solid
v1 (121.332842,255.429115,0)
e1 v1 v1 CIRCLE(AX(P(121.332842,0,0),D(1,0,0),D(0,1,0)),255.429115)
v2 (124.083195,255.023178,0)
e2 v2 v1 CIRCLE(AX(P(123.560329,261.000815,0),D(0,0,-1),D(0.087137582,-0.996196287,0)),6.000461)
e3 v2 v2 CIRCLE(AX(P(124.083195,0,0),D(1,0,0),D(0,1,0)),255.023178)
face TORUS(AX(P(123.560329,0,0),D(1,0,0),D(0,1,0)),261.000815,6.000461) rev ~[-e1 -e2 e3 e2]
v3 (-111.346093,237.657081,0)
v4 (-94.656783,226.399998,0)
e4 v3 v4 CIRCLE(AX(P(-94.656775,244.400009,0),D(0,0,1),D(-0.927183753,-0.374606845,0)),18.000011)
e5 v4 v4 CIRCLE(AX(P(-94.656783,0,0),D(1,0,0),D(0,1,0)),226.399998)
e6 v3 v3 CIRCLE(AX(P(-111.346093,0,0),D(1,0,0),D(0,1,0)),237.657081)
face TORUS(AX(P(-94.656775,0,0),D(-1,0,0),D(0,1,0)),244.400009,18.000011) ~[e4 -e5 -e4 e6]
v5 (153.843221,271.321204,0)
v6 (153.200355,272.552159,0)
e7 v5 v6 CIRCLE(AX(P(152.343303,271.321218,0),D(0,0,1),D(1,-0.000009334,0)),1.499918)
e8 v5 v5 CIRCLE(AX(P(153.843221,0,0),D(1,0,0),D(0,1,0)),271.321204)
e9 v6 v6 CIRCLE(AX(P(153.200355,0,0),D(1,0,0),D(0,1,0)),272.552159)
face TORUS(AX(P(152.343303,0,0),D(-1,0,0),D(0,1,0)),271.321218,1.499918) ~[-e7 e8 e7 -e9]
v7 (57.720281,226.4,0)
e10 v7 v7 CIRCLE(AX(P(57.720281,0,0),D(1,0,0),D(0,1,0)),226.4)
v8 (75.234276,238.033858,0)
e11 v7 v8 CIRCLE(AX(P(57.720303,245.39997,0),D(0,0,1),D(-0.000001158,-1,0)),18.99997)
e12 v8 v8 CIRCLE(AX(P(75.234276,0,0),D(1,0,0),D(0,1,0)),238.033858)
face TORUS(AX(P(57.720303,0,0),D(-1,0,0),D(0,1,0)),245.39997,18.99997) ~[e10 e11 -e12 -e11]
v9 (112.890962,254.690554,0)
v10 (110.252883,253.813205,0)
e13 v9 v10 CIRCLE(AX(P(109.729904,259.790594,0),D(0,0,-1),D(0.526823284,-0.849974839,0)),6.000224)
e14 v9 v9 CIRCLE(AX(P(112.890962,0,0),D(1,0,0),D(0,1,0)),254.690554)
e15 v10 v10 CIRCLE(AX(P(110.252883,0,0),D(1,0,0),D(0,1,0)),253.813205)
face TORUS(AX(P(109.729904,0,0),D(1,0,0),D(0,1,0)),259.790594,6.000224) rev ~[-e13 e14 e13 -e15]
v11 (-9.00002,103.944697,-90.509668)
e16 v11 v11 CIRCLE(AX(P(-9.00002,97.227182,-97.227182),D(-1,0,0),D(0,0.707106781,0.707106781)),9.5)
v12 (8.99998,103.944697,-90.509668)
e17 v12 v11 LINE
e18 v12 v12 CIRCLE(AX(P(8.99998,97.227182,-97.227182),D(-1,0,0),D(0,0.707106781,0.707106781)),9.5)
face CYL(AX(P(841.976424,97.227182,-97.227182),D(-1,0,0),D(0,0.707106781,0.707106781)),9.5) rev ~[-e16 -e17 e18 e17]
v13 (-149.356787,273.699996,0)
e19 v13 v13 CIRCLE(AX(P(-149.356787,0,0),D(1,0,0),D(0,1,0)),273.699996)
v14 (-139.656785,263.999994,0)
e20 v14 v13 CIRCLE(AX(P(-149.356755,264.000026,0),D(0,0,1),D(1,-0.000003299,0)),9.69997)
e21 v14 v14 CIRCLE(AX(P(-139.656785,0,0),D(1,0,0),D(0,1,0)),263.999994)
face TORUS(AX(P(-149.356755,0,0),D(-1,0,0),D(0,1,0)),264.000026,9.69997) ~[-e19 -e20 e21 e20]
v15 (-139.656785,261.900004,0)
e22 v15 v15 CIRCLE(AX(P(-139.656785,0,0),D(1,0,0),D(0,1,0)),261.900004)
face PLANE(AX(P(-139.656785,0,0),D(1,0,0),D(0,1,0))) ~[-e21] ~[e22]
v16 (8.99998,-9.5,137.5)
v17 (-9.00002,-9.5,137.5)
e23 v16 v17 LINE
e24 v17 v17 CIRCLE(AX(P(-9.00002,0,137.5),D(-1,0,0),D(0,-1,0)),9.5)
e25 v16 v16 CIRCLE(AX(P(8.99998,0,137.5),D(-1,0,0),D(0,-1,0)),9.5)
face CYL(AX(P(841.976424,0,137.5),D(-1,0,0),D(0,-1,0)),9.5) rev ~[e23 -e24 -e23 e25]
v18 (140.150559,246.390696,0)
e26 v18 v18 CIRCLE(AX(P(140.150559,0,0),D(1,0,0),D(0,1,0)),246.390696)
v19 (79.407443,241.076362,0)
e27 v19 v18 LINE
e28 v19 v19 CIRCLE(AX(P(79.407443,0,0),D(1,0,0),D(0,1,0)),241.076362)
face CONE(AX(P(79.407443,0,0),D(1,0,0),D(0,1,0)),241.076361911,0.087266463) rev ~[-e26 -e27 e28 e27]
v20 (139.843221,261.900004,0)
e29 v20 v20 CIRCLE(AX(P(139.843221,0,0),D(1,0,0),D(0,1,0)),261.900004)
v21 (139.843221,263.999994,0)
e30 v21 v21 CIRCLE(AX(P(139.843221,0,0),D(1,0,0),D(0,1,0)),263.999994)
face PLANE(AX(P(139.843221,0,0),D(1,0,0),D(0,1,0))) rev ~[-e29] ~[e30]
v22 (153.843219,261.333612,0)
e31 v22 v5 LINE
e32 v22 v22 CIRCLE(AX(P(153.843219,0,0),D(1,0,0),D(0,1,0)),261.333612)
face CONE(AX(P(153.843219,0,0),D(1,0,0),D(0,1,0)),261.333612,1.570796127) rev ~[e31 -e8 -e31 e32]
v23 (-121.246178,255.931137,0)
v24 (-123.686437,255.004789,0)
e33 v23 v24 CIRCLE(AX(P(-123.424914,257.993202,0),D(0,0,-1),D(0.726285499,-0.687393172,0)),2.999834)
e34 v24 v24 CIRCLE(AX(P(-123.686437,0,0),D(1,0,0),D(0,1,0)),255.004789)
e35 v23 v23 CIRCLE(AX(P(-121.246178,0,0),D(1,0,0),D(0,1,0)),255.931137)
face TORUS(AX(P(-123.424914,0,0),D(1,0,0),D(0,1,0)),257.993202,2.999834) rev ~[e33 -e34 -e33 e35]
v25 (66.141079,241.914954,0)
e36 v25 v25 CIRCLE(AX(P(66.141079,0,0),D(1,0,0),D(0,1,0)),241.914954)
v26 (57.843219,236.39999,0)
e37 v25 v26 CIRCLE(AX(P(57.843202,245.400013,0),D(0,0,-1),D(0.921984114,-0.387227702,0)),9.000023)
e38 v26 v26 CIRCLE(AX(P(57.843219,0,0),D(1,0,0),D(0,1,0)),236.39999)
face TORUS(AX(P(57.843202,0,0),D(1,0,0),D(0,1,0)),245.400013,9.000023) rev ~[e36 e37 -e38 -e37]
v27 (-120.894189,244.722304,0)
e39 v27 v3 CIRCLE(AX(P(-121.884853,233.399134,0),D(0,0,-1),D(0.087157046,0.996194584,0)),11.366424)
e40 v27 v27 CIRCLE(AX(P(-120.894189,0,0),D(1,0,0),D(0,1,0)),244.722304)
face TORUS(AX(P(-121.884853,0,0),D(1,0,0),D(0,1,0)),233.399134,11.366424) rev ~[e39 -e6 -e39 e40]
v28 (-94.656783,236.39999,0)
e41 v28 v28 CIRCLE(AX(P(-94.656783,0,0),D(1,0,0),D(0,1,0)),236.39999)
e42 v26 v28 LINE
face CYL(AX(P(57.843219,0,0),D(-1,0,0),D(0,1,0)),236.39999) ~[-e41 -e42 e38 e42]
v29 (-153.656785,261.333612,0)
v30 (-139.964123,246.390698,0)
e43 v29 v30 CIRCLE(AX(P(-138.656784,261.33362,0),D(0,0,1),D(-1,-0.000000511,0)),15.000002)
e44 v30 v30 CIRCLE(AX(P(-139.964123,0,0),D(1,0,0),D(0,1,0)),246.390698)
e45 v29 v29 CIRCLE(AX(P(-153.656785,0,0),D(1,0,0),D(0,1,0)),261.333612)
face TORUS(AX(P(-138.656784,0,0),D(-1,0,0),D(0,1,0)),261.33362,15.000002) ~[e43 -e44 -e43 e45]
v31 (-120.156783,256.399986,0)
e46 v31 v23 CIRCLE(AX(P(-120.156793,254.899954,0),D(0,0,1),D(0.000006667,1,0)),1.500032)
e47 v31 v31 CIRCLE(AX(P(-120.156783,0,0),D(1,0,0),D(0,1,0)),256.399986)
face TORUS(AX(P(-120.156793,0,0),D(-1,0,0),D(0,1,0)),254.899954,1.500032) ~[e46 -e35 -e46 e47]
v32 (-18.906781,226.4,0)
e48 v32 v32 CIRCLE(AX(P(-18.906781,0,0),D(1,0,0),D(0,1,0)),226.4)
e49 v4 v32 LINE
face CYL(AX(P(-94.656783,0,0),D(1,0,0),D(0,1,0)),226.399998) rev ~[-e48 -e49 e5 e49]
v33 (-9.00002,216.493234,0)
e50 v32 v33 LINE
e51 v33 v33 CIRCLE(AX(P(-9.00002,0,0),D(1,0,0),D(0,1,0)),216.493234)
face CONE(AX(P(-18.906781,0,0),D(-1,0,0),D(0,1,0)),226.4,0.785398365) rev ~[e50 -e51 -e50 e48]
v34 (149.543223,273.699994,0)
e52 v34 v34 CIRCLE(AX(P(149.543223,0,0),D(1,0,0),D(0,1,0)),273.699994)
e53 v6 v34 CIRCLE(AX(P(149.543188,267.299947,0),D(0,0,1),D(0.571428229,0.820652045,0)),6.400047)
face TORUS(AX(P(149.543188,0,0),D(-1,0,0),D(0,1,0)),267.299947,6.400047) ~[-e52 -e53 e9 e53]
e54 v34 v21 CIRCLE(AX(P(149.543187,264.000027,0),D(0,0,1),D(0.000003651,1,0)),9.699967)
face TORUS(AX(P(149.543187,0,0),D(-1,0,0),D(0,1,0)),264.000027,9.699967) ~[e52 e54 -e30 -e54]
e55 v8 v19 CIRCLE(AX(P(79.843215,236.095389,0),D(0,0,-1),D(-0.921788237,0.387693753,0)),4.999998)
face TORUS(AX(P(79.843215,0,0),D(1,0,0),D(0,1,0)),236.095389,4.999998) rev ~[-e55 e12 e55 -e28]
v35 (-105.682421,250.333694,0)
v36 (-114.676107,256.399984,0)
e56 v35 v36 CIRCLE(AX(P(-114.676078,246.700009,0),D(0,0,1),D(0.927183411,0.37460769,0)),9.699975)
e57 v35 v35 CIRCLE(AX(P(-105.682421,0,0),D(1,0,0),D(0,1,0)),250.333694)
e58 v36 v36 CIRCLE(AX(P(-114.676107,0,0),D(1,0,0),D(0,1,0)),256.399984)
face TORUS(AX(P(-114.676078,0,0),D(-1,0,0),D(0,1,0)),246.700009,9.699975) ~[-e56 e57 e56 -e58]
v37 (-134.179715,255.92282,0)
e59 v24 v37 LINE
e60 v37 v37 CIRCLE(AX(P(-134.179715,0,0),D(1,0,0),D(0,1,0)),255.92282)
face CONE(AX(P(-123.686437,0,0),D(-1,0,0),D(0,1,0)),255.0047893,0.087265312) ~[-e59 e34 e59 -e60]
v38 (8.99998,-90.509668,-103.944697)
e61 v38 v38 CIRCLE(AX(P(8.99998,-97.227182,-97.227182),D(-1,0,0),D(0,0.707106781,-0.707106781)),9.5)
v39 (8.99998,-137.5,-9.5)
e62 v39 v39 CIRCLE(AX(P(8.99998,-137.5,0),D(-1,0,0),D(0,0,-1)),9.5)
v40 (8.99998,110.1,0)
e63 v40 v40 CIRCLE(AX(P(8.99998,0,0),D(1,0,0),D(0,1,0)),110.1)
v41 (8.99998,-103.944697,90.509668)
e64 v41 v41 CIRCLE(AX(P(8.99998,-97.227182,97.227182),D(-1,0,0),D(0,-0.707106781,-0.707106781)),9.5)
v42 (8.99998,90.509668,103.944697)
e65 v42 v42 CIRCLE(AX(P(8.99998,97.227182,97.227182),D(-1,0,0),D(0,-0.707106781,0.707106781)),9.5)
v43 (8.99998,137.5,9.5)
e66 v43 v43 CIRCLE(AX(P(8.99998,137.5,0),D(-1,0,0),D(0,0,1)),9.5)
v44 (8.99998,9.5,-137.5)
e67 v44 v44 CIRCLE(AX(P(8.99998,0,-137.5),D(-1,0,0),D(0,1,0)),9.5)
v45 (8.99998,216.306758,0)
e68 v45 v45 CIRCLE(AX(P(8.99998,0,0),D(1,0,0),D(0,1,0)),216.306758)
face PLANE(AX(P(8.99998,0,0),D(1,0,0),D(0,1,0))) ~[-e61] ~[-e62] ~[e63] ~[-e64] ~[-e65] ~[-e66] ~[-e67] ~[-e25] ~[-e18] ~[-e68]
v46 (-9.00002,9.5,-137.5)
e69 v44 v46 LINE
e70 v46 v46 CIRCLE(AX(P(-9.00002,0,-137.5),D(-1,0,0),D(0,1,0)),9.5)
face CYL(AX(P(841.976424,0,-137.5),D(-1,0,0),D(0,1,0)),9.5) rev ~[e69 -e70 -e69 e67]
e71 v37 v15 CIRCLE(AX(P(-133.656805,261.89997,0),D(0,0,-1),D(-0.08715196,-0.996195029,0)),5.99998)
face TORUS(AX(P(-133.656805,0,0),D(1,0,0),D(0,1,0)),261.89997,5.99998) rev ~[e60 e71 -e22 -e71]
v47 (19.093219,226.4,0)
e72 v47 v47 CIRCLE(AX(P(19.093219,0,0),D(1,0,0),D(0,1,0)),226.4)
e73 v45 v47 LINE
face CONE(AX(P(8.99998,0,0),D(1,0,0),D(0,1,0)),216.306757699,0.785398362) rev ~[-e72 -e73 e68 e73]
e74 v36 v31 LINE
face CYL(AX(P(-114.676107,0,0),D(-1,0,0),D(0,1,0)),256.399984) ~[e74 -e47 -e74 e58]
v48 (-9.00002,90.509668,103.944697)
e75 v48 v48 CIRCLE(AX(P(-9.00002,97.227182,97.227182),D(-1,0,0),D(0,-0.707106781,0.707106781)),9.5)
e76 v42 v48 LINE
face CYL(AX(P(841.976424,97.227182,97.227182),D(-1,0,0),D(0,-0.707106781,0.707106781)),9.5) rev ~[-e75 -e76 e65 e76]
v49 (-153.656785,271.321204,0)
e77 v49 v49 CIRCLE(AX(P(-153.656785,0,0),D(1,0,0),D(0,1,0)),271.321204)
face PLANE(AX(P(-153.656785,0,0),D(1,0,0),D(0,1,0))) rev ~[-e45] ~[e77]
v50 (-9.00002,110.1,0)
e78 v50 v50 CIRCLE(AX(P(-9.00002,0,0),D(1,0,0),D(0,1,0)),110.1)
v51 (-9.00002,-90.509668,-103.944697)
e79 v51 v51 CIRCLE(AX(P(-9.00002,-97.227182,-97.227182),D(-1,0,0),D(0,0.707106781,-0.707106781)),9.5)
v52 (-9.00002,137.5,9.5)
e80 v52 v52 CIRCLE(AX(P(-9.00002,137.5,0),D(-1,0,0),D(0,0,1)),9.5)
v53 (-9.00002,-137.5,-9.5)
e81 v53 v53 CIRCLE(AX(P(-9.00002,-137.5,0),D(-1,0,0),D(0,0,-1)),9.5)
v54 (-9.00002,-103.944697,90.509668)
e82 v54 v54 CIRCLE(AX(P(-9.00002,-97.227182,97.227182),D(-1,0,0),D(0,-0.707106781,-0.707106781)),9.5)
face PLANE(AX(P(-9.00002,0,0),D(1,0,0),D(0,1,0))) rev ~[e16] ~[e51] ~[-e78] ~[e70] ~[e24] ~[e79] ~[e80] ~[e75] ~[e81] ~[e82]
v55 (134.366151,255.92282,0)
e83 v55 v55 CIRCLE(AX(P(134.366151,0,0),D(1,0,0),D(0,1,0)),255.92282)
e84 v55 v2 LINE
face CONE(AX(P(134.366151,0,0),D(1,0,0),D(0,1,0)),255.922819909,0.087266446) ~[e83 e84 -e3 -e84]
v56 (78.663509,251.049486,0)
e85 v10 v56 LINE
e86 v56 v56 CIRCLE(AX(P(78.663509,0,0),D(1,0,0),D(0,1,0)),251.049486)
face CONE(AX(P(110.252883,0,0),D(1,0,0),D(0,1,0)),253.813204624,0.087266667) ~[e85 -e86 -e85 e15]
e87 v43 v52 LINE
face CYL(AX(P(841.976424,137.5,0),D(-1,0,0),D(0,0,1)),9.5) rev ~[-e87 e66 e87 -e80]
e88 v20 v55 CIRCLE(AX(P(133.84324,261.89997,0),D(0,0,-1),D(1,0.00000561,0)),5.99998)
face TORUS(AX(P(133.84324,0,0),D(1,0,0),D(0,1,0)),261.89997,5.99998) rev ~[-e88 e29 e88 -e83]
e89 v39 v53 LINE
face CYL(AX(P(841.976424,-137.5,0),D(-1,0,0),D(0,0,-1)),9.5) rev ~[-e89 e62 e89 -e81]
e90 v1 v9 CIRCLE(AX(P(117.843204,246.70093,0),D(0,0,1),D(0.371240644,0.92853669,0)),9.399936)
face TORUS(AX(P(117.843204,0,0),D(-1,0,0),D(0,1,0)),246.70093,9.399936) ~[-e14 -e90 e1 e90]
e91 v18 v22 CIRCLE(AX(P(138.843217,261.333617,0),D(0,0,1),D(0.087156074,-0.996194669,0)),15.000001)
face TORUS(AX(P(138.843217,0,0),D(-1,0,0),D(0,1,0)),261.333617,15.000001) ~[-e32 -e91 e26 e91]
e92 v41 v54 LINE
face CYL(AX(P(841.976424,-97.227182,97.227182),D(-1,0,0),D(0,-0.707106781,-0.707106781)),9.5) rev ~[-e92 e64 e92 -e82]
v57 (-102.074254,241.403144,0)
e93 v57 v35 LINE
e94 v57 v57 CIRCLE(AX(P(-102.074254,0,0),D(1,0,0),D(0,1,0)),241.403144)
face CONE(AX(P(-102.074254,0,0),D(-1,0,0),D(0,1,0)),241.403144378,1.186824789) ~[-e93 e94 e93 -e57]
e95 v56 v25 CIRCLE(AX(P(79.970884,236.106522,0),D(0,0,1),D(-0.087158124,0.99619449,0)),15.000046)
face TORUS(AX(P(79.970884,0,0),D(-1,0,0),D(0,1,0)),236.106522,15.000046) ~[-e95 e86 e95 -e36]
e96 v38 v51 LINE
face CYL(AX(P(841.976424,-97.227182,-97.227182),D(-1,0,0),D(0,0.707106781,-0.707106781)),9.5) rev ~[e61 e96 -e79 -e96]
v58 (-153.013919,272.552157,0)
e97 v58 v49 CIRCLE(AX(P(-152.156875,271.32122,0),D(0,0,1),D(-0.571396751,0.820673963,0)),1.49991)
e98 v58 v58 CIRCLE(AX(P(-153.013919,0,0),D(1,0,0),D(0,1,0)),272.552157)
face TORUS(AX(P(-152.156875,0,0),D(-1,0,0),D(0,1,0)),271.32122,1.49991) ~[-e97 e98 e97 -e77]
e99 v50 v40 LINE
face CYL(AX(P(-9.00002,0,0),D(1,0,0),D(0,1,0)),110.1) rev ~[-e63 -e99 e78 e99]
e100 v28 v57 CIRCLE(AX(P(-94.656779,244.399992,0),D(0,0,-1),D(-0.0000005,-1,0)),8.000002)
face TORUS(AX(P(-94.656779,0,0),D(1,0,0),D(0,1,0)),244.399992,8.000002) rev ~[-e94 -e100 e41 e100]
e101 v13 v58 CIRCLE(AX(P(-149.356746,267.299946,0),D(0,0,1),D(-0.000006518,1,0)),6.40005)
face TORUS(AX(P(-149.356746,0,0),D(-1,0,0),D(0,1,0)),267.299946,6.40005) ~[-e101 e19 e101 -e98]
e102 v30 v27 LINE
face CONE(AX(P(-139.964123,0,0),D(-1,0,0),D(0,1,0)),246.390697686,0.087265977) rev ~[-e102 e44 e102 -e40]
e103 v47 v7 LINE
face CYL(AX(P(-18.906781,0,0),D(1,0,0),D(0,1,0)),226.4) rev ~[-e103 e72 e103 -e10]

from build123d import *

# Parameters (mm, degrees)
F2_SCALE        = 2
F4_D            = 19
F4_COPIES_COUNT = 8


# Not quite as in the source:
# - ends of sketch curves that miss each other by under 0.0002 mm in the source are joined
# - a pattern or mirror of a feature is missing from the dataset's text; its kind, count and spacing are read off the source's solid


with BuildPart() as f1:
    # F0 (on Top) → F1 (revolve)
    with BuildSketch(Plane.XY):
        with BuildLine():
            Line((-69.8283927139, 130.950002), (-69.8283927139, 131.999997))
            ThreePointArc((-69.8283927139, 131.999997), (-71.2489204318, 135.4294702822), (-74.6783937139, 136.849998))
            ThreePointArc((-74.6783937139, 136.849998), (-75.6366511648, 136.703145556), (-76.50695947, 136.2760786497))
            ThreePointArc((-76.50695947, 136.2760786497), (-76.7431968016, 136.0077812035), (-76.8283927139, 135.660602))
            Line((-76.8283927139, 135.660602), (-76.8283927139, 130.666806))
            ThreePointArc((-76.8283927139, 130.666806), (-74.8579716468, 125.5998817301), (-69.9820616402, 123.195348843))
            Line((-69.9820616402, 123.195348843), (-60.4470947139, 122.361152))
            ThreePointArc((-60.4470947139, 122.361152), (-57.5619219055, 121.268055358), (-55.6730463485, 118.8285407436))
            ThreePointArc((-55.6730463485, 118.8285407436), (-52.3611274066, 114.7386622182), (-47.3283917139, 113.199999))
            Line((-47.3283917139, 113.199999), (-9.4533907139, 113.2))
            Line((-9.4533907139, 113.2), (-4.5000098646, 113.2))
            Line((-4.5000098646, 113.2), (4.4999901354, 113.2))
            Line((4.4999901354, 113.2), (9.5466092861, 113.2))
            Line((9.5466092861, 113.2), (28.8601402861, 113.2))
            ThreePointArc((28.8601402861, 113.2), (34.1166063672, 114.7867432509), (37.6171377565, 119.0169288021))
            ThreePointArc((37.6171377565, 119.0169288021), (38.4488135479, 120.0678119715), (39.70372129, 120.5381809556))
            Line((39.70372129, 120.5381809556), (70.0752792861, 123.195348))
            ThreePointArc((70.0752792861, 123.195348), (74.951189219, 125.5998817301), (76.9216092861, 130.666806))
            Line((76.9216092861, 130.666806), (76.9216102861, 135.660602))
            ThreePointArc((76.9216102861, 135.660602), (76.8364143738, 136.0077812035), (76.600177533, 136.2760793546))
            ThreePointArc((76.600177533, 136.2760793546), (75.7298687369, 136.703145556), (74.7716112861, 136.849997))
            ThreePointArc((74.7716112861, 136.849997), (71.3421380039, 135.4294702822), (69.9216102861, 131.999997))
            Line((69.9216102861, 131.999997), (69.9216102861, 130.950002))
            ThreePointArc((69.9216102861, 130.950002), (69.1334468957, 128.923223416), (67.1830752901, 127.9614099543))
            Line((67.1830752901, 127.9614099543), (62.0415972861, 127.511589))
            ThreePointArc((62.0415972861, 127.511589), (61.3420921388, 127.5323313866), (60.6664211665, 127.714557701))
            ThreePointArc((60.6664211665, 127.714557701), (58.5119771245, 128.0325485601), (56.4454811465, 127.3452772251))
            ThreePointArc((56.4454811465, 127.3452772251), (55.8117185261, 127.0484907088), (55.1264412588, 126.9066023119))
            Line((55.1264412588, 126.9066023119), (39.3317542861, 125.524743))
            ThreePointArc((39.3317542861, 125.524743), (35.565502201, 124.1125085278), (33.0705397086, 120.9574772425))
            ThreePointArc((33.0705397086, 120.9574772425), (31.4124577957, 118.9522425502), (28.9216092861, 118.199995))
            Line((28.9216092861, 118.199995), (-47.3283917139, 118.199995))
            ThreePointArc((-47.3283917139, 118.199995), (-49.5651640292, 118.8838463257), (-51.0371272461, 120.701572189))
            Line((-51.0371272461, 120.701572189), (-52.8412107139, 125.166847))
            ThreePointArc((-52.8412107139, 125.166847), (-54.6259688487, 127.3708322029), (-57.3380537139, 128.199992))
            Line((-57.3380537139, 128.199992), (-60.0783917139, 128.199993))
            ThreePointArc((-60.0783917139, 128.199993), (-60.3748925736, 128.138899496), (-60.6230889783, 127.9655682503))
            ThreePointArc((-60.6230889783, 127.9655682503), (-61.1801374973, 127.5943217232), (-61.8432187446, 127.5023946498))
            Line((-61.8432187446, 127.5023946498), (-67.0898577139, 127.96141))
            ThreePointArc((-67.0898577139, 127.96141), (-69.0402293235, 128.923223416), (-69.8283927139, 130.950002))
        make_face()
        Polygon((-4.5000098646, 113.2), (-9.4533907139, 113.2), (-4.5000098646, 108.2466171506), align=None)
        Polygon((4.4999901354, 113.2), (-4.5000098646, 113.2), (-4.5000098646, 108.2466171506), (-4.5000098646, 55.05), (4.4999901354, 55.05), (4.4999901354, 108.1533788494), align=None)
        Polygon((9.5466092861, 113.2), (4.4999901354, 113.2), (4.4999901354, 108.1533788494), align=None)
    revolve(axis=Axis((-9.8646e-06, 0, 0), (1, 0, 0)))


with BuildPart() as f1_1:
    # F2: moved
    add(f1.part.scale(F2_SCALE))

    # F4 (through all)
    with Locations(Plane.YZ.offset(8.9999802709)):
        with Locations((0, 137.5)):
            f4 = Hole(F4_D / 2)

    # F4_copies: F4 ×8 about axis
    f4_copies_axis = Axis((0, 0, 0), (1, 0, 0))
    for i in range(1, F4_COPIES_COUNT):
        add(f4.rotate(f4_copies_axis, i * 360 / F4_COPIES_COUNT), mode=Mode.SUBTRACT)


solid = f1_1.part
